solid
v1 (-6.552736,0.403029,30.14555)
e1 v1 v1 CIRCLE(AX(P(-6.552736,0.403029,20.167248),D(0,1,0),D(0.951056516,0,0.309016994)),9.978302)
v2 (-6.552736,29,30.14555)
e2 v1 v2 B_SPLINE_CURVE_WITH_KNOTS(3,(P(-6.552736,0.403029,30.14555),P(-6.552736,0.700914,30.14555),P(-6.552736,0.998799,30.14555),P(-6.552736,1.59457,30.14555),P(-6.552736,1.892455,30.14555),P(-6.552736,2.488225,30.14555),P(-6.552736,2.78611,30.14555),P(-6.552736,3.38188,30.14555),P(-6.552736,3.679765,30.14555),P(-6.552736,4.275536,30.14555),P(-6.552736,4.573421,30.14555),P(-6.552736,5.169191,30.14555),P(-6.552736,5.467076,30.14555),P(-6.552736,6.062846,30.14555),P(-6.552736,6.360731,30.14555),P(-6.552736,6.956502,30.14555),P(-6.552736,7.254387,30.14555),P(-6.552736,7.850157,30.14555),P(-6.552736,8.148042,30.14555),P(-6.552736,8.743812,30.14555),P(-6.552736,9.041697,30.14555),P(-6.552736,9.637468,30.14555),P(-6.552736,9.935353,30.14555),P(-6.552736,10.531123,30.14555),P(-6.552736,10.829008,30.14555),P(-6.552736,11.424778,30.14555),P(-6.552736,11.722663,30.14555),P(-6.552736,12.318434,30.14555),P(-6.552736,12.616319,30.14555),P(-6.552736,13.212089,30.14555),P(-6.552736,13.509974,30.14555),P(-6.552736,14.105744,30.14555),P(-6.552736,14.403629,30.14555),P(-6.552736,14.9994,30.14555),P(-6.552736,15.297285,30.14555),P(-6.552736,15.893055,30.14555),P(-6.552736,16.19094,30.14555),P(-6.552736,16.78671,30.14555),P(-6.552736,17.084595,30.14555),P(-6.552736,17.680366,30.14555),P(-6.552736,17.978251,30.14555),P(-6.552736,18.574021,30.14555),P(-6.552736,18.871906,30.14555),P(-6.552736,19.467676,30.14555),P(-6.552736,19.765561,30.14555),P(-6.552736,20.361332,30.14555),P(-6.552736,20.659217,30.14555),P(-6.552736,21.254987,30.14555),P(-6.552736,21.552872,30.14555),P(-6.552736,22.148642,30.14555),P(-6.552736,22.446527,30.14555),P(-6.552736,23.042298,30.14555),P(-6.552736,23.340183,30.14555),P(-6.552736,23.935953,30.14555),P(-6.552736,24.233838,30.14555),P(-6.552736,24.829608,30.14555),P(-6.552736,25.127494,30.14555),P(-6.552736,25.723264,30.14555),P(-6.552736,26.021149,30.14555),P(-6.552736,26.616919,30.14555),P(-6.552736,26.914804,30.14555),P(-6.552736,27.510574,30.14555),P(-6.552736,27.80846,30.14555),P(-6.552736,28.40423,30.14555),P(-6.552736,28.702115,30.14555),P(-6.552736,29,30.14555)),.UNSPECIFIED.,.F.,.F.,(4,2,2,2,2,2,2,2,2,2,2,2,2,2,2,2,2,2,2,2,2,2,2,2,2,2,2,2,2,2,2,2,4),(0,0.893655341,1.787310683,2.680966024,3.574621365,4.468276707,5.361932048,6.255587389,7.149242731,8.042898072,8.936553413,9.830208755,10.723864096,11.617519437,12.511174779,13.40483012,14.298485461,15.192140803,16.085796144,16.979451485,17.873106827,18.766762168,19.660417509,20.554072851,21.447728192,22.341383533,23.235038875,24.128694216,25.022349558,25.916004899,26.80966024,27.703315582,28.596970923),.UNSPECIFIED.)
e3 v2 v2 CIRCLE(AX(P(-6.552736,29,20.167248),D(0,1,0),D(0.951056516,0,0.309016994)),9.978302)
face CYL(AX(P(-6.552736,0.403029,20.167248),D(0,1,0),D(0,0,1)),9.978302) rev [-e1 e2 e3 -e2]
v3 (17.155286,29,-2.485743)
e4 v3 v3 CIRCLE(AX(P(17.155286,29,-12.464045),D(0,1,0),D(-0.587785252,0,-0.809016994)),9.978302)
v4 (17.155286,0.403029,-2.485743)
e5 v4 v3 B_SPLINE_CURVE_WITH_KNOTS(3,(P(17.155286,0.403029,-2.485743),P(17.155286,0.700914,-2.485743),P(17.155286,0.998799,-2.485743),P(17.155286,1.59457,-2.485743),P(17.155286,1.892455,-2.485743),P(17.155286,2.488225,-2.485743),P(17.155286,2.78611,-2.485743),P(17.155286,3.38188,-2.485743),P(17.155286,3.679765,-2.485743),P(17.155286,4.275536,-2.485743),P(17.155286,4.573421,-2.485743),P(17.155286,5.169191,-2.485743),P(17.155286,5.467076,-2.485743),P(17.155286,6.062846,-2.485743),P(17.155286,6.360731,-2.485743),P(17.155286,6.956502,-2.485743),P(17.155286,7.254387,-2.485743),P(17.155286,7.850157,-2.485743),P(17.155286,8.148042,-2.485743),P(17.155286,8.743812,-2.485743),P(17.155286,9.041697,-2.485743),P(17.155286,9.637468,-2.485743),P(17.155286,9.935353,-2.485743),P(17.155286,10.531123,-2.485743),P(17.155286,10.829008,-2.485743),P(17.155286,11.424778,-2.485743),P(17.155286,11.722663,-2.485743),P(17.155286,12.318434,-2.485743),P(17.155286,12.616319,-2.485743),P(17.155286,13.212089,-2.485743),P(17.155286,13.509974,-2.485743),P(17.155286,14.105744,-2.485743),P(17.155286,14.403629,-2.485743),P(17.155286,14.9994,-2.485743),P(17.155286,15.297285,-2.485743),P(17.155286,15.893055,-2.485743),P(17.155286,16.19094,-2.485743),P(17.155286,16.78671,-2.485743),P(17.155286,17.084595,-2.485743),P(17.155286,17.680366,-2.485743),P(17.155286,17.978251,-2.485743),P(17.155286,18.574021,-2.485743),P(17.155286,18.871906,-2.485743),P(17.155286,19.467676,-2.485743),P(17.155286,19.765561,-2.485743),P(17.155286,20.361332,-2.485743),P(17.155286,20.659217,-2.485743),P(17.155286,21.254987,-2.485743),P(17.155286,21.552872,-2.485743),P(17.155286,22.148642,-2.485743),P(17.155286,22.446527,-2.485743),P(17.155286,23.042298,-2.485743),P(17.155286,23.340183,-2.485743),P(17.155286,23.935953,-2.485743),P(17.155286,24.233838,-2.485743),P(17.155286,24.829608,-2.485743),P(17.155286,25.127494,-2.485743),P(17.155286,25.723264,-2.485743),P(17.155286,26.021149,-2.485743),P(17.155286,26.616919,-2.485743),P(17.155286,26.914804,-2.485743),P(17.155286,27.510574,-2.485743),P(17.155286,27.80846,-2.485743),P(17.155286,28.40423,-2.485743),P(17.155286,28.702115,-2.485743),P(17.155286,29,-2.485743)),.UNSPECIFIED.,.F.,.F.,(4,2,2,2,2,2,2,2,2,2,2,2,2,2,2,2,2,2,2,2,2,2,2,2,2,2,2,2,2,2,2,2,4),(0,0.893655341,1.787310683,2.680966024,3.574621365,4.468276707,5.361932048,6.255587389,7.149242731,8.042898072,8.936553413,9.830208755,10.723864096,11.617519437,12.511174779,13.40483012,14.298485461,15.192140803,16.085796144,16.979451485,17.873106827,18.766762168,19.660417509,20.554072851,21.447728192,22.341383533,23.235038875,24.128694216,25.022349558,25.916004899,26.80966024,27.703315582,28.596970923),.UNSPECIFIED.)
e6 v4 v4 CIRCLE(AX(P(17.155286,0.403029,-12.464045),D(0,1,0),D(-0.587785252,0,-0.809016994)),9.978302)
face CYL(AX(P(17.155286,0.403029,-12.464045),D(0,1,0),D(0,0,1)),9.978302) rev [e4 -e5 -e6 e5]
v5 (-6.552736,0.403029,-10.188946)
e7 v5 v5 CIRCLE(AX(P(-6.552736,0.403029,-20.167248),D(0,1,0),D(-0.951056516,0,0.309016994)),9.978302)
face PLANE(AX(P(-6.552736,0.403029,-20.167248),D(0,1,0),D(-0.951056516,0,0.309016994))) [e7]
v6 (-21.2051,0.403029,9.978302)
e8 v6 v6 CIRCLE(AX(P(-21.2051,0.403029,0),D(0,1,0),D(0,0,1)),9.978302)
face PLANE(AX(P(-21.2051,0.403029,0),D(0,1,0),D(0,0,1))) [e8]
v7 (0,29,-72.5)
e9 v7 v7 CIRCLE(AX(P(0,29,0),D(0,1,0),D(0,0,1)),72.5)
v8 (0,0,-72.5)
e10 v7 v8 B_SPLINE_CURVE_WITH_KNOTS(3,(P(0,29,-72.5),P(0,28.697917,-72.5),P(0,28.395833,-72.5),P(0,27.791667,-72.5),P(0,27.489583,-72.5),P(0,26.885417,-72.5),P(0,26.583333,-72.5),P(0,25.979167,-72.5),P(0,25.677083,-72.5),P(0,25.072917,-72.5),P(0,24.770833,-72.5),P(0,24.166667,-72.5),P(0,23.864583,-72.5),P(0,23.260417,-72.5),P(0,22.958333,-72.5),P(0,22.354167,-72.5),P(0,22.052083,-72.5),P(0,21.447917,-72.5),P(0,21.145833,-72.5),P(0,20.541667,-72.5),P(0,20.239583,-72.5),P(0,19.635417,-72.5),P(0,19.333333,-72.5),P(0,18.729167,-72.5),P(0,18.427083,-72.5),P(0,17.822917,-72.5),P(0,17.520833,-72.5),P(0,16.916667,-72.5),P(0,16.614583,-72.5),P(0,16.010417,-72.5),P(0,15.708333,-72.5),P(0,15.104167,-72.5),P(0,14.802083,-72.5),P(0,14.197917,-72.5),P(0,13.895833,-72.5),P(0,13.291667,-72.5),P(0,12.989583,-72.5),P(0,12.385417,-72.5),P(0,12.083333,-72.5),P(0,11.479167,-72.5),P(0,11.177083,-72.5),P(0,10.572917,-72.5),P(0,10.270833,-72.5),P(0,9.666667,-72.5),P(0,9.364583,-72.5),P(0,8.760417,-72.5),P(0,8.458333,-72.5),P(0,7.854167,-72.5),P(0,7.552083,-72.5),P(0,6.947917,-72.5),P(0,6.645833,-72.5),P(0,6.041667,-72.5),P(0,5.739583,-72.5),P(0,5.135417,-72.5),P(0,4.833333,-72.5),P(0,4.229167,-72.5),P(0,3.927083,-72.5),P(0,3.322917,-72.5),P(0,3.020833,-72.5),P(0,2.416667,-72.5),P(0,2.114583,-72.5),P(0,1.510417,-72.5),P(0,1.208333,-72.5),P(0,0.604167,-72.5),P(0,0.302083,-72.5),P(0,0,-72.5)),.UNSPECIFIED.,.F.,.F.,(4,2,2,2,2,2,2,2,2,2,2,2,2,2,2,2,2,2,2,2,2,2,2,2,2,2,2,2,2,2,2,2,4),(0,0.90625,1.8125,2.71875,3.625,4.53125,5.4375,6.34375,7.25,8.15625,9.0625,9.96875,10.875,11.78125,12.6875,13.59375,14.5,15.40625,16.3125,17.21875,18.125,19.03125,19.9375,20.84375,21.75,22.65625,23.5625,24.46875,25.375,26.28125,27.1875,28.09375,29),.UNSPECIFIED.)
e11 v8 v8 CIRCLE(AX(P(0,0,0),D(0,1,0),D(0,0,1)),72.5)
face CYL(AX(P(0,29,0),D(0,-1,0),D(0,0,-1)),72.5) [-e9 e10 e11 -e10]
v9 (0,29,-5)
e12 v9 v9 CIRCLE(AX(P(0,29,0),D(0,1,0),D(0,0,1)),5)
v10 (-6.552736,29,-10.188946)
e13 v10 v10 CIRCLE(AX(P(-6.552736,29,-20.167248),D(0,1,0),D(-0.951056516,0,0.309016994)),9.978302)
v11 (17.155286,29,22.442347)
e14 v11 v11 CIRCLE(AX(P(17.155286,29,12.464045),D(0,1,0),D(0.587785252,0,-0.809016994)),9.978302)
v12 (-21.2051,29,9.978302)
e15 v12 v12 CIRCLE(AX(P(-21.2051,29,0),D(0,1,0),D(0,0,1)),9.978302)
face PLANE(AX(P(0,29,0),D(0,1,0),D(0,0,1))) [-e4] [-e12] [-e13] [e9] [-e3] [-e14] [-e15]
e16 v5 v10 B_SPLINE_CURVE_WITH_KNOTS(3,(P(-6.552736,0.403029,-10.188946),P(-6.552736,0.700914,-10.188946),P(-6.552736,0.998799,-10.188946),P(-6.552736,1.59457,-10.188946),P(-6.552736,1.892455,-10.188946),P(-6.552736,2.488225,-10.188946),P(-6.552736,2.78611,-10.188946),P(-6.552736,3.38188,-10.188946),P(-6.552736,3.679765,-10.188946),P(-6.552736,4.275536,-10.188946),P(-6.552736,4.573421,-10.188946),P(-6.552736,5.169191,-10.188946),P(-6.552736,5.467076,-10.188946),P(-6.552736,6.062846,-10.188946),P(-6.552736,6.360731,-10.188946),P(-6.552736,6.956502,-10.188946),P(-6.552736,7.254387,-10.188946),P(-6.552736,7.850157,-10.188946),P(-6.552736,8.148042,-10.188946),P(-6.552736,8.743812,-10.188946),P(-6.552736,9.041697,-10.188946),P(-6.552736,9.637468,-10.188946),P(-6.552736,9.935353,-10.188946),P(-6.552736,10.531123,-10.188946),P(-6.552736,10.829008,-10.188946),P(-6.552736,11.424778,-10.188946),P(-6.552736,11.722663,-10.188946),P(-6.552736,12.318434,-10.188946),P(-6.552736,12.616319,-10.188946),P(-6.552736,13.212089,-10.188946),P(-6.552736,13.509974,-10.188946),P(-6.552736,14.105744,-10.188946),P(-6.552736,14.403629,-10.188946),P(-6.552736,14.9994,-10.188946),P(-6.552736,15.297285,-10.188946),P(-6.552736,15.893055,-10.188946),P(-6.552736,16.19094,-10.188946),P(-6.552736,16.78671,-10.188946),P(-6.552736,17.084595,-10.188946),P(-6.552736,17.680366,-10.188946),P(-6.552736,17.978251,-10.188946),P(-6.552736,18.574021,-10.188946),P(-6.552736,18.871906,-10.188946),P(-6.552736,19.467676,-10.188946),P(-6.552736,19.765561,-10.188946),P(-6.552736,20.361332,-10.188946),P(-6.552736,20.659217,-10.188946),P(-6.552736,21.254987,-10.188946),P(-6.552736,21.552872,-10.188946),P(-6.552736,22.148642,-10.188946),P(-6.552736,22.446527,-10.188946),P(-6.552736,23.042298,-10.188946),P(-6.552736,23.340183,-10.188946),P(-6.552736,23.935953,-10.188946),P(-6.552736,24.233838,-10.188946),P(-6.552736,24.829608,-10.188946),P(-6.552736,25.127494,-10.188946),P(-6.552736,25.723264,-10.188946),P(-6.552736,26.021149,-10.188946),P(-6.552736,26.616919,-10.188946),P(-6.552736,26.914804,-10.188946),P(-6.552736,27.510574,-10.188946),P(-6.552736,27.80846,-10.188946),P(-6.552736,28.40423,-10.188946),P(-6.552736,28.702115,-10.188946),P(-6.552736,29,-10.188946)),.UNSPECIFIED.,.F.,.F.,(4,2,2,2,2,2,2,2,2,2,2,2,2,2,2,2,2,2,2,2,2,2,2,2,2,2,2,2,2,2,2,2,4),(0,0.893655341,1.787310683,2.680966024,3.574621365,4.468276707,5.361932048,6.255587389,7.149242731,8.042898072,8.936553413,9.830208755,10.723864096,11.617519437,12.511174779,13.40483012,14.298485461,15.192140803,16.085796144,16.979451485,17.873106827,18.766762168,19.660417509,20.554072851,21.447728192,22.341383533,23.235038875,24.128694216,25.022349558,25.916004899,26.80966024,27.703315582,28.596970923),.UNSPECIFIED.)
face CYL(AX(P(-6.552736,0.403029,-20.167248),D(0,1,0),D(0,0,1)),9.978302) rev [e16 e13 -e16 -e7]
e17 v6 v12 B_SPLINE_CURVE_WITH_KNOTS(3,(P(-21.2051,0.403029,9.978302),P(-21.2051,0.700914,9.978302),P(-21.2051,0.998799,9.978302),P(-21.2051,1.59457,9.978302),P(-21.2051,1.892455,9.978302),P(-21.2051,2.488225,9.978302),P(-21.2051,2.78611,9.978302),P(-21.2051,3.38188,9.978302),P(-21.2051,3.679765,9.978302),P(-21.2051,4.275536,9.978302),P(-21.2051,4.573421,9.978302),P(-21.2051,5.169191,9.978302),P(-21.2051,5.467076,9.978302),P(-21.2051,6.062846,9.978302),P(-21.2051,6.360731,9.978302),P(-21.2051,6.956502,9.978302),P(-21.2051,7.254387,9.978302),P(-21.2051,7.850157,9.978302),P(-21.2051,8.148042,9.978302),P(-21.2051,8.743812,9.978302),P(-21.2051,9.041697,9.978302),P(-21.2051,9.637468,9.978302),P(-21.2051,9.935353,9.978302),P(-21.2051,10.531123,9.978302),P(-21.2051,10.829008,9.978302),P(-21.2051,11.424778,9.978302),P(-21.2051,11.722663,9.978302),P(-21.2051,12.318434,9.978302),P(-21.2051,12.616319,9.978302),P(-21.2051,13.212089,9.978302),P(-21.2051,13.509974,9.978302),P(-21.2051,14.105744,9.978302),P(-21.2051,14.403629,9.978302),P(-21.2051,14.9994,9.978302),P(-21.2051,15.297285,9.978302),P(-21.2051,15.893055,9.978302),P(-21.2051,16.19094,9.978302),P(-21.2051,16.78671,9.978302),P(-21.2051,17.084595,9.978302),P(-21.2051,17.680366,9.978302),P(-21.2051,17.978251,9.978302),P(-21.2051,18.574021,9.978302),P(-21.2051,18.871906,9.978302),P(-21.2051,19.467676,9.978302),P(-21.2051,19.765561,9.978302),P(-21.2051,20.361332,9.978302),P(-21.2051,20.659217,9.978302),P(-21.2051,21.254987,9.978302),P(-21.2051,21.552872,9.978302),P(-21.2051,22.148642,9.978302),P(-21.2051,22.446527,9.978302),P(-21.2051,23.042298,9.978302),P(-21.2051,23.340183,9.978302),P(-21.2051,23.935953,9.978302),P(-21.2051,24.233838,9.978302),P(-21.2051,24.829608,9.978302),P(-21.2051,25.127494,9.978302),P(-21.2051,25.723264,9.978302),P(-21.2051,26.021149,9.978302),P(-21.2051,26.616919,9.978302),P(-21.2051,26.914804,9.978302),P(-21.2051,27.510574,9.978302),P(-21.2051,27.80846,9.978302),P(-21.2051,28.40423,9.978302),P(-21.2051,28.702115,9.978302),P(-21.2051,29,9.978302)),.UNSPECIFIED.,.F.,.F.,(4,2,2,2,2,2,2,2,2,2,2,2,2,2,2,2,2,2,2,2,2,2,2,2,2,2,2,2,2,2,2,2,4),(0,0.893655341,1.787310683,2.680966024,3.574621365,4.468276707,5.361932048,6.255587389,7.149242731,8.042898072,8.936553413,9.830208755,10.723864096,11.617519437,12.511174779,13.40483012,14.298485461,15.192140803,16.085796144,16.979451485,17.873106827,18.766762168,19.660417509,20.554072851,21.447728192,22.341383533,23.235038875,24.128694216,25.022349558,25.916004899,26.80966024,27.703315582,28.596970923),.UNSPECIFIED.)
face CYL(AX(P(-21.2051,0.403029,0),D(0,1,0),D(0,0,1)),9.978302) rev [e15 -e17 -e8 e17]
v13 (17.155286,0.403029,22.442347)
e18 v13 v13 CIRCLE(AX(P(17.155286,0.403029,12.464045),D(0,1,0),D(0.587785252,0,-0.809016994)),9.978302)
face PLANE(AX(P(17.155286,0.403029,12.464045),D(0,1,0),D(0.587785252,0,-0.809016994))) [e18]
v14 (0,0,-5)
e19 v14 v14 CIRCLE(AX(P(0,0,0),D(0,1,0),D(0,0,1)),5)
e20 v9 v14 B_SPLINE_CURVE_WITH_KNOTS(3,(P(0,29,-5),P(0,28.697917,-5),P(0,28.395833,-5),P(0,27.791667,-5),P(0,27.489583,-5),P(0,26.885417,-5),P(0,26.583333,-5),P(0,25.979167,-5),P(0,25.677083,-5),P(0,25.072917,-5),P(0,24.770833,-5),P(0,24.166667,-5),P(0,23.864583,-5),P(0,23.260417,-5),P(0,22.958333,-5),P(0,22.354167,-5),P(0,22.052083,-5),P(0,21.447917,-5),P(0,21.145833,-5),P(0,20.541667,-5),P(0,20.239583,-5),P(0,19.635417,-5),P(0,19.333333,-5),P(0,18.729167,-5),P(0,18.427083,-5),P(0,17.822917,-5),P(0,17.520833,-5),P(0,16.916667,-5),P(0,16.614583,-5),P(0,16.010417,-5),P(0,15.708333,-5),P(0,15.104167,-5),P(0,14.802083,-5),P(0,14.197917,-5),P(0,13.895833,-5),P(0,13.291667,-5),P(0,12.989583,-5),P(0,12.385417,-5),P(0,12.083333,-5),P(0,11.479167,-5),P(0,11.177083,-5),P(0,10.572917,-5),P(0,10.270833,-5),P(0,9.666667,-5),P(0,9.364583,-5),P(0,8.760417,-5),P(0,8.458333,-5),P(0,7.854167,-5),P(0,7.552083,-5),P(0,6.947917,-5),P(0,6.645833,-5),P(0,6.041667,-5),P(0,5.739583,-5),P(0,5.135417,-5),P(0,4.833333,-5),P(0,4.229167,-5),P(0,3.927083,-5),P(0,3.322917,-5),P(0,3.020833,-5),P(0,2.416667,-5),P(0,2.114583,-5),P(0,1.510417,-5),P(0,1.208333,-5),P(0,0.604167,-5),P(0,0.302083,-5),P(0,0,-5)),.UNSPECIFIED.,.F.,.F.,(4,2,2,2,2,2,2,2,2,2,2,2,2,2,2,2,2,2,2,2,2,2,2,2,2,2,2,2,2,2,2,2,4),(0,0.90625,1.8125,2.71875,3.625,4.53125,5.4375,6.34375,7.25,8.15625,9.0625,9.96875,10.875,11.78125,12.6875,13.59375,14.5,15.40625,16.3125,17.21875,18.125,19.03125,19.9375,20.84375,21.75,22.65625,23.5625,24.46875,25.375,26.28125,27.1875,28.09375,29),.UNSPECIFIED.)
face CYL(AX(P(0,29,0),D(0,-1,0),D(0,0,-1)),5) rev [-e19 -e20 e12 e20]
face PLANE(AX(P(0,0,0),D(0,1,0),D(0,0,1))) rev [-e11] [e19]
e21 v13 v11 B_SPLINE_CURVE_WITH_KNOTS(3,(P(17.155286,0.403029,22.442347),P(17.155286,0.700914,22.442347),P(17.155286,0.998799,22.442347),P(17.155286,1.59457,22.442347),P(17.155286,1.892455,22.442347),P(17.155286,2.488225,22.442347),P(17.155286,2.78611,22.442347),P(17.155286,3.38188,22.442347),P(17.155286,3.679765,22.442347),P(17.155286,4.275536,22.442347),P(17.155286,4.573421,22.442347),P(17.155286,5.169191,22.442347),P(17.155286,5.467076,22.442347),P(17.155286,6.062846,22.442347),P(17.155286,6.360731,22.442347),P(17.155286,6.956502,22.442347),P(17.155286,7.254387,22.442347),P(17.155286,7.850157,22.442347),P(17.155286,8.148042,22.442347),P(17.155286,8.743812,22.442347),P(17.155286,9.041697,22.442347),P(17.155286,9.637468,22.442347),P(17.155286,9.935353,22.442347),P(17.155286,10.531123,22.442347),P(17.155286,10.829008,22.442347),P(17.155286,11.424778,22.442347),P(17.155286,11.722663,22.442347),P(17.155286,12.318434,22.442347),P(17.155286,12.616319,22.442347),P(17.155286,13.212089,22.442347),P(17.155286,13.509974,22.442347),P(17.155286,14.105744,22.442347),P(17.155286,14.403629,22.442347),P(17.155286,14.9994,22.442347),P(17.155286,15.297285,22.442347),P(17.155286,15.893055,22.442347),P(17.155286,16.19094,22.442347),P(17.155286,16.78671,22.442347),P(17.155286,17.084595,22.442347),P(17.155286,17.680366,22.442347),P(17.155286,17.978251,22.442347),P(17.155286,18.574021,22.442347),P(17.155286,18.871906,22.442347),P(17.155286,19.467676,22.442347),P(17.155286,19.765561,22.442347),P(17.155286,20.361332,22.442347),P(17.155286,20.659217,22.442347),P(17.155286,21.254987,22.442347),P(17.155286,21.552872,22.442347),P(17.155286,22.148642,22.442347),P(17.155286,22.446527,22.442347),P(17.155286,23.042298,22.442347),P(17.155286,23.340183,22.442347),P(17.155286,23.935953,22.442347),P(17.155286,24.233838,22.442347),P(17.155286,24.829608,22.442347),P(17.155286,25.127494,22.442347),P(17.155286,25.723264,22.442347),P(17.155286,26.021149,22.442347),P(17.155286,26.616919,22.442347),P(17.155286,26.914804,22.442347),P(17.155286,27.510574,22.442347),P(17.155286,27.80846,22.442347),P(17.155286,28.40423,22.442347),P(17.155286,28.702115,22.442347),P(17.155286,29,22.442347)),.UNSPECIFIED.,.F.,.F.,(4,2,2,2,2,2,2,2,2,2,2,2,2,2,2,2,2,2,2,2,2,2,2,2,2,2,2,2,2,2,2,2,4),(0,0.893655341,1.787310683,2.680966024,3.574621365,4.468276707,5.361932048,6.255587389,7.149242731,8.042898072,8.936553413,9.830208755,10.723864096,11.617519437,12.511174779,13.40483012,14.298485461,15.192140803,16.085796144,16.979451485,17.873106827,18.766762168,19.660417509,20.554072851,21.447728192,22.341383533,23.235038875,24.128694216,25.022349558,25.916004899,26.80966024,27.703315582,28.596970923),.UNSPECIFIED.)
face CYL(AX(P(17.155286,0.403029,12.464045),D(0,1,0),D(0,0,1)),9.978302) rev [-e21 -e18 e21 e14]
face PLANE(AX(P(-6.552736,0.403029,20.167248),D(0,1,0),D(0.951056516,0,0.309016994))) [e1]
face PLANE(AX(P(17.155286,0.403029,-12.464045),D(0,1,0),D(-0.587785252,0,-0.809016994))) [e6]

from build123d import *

# Parameters (mm, degrees)
SKETCH1_R           = 72.5
BOSS_EXTRUDE1_DEPTH = 29
SKETCH2_R           = 5
CUT_EXTRUDE1_DEPTH  = 107.552803811
SKETCH3_R           = 9.978301822
CUT_EXTRUDE2_DEPTH  = 28.596970923
CIRPATTERN1_COUNT   = 5


with BuildPart() as part:
    # Sketch1 → Boss-Extrude1 (new body)
    with BuildSketch(Plane(origin=(0, 0, 0), x_dir=(1, 0, 0), z_dir=(0, 1, 0))):
        Circle(SKETCH1_R)
    extrude(amount=BOSS_EXTRUDE1_DEPTH)

    # Sketch2 → Cut-Extrude1 (cut, through all)
    with BuildSketch(Plane(origin=(0, 0, 0), x_dir=(1, 0, 0), z_dir=(0, 1, 0))):
        Circle(SKETCH2_R)
    extrude(amount=CUT_EXTRUDE1_DEPTH, mode=Mode.SUBTRACT)

    # Sketch3 → Cut-Extrude2 (cut)
    with BuildSketch(Plane(origin=(0, 29, 0), x_dir=(1, 0, 0), z_dir=(0, 1, 0))):
        with Locations((-21.20509972, 0)):
            Circle(SKETCH3_R)
    cut_extrude2 = extrude(amount=-CUT_EXTRUDE2_DEPTH, mode=Mode.SUBTRACT)

    # CirPattern1: Cut-Extrude2 ×5 about axis
    cirpattern1_axis = Axis((0, 0, 0), (0, 1, 0))
    for i in range(1, CIRPATTERN1_COUNT):
        add(cut_extrude2.rotate(cirpattern1_axis, i * 360 / CIRPATTERN1_COUNT), mode=Mode.SUBTRACT)


solid = part.part
